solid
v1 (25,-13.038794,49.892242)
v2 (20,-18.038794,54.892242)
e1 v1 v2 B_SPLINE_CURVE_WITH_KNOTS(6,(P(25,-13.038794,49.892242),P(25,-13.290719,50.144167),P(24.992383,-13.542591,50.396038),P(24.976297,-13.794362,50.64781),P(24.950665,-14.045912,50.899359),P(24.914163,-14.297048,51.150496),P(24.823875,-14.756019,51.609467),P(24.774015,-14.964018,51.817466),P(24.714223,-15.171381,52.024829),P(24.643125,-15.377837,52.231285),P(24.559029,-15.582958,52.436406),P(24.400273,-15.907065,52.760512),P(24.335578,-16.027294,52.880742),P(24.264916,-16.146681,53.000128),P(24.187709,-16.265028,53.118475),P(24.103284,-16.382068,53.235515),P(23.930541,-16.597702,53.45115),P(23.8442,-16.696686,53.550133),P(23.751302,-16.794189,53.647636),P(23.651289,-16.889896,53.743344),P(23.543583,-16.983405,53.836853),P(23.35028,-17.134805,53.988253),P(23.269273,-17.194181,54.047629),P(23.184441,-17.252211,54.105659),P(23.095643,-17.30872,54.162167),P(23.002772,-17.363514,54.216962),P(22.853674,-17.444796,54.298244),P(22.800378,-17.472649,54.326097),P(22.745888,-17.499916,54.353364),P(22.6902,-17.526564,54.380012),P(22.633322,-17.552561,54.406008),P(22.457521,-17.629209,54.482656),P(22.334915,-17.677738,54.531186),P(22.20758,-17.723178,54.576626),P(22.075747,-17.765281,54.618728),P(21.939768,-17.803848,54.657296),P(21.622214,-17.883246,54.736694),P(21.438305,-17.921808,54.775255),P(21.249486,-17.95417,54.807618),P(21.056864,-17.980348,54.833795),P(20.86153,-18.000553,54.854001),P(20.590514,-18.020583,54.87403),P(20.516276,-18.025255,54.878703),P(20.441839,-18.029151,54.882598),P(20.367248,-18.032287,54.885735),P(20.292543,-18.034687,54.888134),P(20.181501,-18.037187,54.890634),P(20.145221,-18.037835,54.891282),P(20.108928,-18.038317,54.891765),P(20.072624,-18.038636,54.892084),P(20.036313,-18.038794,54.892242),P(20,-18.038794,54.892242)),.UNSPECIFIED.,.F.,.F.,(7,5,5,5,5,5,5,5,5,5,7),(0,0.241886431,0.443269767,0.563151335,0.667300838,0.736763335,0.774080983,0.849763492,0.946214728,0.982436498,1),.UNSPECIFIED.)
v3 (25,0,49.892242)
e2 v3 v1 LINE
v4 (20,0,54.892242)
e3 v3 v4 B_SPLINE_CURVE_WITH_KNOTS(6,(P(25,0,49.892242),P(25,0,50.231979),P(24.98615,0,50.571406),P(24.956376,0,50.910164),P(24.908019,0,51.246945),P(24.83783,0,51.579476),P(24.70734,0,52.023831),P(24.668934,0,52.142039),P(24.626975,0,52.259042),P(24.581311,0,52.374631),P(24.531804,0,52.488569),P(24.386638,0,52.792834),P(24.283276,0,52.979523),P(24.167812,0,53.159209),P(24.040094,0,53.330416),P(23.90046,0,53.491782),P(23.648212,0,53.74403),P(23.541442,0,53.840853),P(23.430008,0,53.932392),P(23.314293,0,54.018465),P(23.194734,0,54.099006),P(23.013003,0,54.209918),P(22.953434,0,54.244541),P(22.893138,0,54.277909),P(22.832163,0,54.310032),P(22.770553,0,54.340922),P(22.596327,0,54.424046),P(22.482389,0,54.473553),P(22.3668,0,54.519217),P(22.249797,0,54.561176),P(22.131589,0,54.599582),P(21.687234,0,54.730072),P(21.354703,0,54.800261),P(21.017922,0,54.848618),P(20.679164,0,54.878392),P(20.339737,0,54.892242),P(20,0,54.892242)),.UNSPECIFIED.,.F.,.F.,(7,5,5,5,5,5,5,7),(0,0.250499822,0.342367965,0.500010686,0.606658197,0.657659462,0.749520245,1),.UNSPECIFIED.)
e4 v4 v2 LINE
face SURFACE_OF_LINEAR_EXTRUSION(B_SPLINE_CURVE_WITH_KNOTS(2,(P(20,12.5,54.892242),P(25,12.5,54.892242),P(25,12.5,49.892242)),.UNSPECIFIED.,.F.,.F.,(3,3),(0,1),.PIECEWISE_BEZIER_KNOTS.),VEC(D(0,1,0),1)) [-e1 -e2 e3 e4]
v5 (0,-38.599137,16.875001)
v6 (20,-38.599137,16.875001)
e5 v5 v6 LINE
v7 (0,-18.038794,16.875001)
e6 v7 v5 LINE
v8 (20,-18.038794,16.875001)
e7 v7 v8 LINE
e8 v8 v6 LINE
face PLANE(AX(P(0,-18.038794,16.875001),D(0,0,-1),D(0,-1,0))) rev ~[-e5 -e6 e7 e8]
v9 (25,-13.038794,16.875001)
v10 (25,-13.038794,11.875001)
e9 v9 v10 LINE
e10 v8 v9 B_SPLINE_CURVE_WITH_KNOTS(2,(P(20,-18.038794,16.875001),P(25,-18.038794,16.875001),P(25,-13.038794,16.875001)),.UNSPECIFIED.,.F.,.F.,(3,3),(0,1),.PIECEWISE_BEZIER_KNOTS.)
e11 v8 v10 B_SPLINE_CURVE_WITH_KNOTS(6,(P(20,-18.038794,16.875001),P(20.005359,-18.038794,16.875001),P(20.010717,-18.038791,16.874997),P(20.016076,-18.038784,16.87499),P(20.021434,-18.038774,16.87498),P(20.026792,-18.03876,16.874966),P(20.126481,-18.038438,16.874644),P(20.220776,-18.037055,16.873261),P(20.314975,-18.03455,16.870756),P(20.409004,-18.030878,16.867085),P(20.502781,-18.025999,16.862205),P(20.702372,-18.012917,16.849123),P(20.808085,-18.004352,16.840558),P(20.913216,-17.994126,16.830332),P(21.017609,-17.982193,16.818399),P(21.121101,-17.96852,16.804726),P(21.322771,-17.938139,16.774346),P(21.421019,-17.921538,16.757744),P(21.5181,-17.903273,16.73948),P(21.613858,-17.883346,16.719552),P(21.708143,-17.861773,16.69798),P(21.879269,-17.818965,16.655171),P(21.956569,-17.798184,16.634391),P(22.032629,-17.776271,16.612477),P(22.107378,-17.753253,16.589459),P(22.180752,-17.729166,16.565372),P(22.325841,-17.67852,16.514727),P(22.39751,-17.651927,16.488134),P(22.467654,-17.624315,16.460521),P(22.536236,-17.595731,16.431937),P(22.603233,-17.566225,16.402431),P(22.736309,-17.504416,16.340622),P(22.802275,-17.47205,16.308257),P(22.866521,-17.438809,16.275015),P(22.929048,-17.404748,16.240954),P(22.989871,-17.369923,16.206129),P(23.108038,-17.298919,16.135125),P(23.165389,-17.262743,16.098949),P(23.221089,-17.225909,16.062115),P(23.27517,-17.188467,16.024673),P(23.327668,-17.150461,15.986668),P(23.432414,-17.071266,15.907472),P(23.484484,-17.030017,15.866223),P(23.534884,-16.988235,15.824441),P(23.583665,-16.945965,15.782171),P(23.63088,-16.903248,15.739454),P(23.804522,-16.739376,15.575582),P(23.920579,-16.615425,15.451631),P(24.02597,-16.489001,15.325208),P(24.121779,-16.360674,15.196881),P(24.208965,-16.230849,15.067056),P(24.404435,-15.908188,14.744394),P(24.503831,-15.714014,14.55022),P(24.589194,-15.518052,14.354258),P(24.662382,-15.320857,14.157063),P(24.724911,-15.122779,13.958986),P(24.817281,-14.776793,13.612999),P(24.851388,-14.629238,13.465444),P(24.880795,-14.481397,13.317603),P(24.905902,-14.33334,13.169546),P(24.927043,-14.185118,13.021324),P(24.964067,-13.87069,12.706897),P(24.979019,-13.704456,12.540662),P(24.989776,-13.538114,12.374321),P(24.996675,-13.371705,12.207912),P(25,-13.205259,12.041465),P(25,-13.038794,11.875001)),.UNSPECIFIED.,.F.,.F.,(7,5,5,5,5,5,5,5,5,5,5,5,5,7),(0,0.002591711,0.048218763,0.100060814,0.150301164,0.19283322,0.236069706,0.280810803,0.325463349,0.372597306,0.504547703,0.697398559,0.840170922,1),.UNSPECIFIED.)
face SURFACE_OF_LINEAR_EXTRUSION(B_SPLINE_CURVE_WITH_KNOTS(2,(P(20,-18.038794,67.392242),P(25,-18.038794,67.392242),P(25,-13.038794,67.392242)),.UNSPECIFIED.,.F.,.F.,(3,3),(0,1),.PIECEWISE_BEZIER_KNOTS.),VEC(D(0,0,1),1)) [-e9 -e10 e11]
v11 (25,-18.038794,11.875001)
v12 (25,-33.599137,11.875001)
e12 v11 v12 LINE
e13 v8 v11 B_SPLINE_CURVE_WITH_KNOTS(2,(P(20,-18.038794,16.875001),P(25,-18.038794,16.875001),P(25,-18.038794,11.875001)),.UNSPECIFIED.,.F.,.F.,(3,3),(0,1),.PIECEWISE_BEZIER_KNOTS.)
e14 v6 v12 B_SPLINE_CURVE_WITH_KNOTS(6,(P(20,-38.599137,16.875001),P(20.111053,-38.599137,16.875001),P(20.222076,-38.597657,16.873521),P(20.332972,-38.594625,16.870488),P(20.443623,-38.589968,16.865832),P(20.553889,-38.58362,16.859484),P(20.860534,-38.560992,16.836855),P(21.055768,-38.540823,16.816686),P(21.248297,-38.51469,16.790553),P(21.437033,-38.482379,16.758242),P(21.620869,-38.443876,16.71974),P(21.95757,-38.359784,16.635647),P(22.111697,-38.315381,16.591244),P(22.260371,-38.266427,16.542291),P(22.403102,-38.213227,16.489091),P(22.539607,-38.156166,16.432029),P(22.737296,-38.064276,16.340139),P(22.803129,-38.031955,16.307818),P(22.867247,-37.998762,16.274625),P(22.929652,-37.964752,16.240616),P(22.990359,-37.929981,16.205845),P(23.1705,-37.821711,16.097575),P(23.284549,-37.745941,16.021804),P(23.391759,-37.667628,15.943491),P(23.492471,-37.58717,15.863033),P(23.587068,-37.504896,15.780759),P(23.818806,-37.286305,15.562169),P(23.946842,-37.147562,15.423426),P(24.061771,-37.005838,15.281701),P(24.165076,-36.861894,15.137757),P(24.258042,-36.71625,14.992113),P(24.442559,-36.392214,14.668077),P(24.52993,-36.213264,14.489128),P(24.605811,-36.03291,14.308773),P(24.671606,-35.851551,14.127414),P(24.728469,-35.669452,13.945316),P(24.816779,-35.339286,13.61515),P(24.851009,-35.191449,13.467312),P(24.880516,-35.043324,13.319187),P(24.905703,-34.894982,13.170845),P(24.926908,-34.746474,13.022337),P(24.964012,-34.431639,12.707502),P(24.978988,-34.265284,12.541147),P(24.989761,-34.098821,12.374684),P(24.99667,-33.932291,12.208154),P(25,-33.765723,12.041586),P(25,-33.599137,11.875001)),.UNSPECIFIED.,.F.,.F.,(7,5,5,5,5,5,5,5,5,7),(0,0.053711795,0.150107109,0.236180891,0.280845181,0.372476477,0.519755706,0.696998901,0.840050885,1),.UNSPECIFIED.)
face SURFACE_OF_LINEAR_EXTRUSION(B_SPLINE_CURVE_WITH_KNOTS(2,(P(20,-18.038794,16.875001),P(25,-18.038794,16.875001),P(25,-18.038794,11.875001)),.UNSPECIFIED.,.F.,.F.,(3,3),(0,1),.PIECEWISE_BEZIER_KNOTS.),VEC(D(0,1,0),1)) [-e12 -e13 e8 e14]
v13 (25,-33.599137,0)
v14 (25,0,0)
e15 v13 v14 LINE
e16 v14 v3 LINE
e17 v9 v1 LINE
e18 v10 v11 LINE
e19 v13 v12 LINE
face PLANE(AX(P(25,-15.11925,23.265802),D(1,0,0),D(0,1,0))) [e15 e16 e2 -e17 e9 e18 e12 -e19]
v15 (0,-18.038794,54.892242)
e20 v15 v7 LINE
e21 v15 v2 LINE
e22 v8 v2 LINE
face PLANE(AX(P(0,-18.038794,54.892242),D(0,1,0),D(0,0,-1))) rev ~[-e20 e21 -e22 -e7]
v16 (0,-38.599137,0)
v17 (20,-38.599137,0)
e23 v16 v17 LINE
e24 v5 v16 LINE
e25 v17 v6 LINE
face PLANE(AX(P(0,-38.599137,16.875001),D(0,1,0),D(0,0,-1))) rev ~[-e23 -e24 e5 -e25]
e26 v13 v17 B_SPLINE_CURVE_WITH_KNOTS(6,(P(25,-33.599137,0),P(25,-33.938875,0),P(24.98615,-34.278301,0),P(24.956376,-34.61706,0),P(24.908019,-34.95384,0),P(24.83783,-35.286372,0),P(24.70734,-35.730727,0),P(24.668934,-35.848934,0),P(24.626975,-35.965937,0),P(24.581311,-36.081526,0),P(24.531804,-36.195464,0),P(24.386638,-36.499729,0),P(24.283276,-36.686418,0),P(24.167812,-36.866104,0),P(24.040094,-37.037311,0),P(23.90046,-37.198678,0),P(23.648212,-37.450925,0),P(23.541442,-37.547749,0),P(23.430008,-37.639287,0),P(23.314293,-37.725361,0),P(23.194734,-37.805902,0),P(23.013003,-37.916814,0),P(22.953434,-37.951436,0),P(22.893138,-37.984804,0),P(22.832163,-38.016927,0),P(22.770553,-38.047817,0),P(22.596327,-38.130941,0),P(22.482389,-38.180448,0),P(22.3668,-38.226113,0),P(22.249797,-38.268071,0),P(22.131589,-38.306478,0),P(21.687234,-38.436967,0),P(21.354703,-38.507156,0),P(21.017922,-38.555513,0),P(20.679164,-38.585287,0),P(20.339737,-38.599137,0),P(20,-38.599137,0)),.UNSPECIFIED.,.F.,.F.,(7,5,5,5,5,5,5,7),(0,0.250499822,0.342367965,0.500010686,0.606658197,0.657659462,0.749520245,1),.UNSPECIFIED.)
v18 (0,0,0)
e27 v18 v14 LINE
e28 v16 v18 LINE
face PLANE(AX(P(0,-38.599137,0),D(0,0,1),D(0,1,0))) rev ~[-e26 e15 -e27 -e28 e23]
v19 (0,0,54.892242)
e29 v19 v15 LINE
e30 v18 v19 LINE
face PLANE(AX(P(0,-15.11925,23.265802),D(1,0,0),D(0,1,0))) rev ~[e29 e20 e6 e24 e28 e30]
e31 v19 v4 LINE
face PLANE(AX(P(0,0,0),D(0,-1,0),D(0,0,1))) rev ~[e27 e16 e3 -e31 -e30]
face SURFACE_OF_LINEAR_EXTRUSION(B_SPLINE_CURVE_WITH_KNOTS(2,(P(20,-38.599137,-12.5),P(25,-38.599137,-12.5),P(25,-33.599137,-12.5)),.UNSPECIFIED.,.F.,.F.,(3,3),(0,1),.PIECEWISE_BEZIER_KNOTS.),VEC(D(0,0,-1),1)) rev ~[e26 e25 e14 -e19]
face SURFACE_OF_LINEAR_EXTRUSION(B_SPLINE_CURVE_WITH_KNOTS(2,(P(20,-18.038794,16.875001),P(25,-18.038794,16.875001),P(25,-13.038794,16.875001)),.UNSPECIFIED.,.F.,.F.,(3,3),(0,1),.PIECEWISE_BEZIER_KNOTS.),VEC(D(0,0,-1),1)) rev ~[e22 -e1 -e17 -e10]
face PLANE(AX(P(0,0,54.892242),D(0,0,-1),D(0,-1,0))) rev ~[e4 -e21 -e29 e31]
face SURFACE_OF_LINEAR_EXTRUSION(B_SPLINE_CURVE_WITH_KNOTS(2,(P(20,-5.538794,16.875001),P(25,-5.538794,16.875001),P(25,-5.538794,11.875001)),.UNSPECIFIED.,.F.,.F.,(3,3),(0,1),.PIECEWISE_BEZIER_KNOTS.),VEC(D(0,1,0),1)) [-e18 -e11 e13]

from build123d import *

# Parameters (mm, degrees)
F1_DEPTH     = 25
F2_T1_DEPTH  = 50.5172412843
F2_T3_DEPTH  = 43.0387943983
F2_T5_DEPTH  = 33.0603428185
F2_T7_DEPTH  = 41.8750006706
F2_T13_DEPTH = 63.0172412843
F2_T17_DEPTH = 45.5603428185


# Not quite as in the source:
# - a fillet or chamfer that OpenCascade refuses, or shapes differently, is made with other operations: its cross-section is extruded or revolved along the edge and cut away or added


with BuildPart() as f1:
    # F0 (on Right) → F1 (new body)
    with BuildSketch(Plane.YZ):
        Polygon((-38.5991372168, 16.8750006706), (-38.5991372168, 0), (0, 0), (0, 54.8922419548), (-18.0387943983, 54.8922419548), (-18.0387943983, 16.8750006706), align=None)
    extrude(amount=F1_DEPTH)

    # F2: fillet of radius 5 on 4 edges, made by hand

    # F2_s2 → F2_t1 (cut)
    with BuildSketch(Plane.XY.offset(16.8750006706)):
        with BuildLine():
            add(Edge.make_bspline(
                [(20, -18.0387943983), (25, -18.0387943983), (25, -13.0387943983)],
                knots=[0, 0, 0, 1, 1, 1], degree=2, weights=[1, 1, 1]))
            Line((25, -13.0387943983), (25, -18.0387943983))
            Line((25, -18.0387943983), (20, -18.0387943983))
        make_face()
    extrude(amount=F2_T1_DEPTH, mode=Mode.SUBTRACT)

    # F2_s4 → F2_t3 (cut)
    with BuildSketch(Plane.XZ.offset(-12.5)):
        with BuildLine():
            add(Edge.make_bspline(
                [(20, 54.8922419548), (25, 54.8922419548), (25, 49.8922419548)],
                knots=[0, 0, 0, 1, 1, 1], degree=2, weights=[1, 1, 1]))
            Line((25, 49.8922419548), (25, 54.8922419548))
            Line((25, 54.8922419548), (20, 54.8922419548))
        make_face()
    extrude(amount=F2_T3_DEPTH, mode=Mode.SUBTRACT)

    # F2_s6 → F2_t5 (cut)
    with BuildSketch(Plane.XZ.offset(18.0387943983)):
        with BuildLine():
            add(Edge.make_bspline(
                [(20, 16.8750006706), (25, 16.8750006706), (25, 11.8750006706)],
                knots=[0, 0, 0, 1, 1, 1], degree=2, weights=[1, 1, 1]))
            Line((25, 11.8750006706), (25, 16.8750006706))
            Line((25, 16.8750006706), (20, 16.8750006706))
        make_face()
    extrude(amount=F2_T5_DEPTH, mode=Mode.SUBTRACT)

    # F2_s8 → F2_t7 (cut)
    with BuildSketch(Plane.XY.offset(-12.5)):
        with BuildLine():
            add(Edge.make_bspline(
                [(20, -38.5991372168), (25, -38.5991372168), (25, -33.5991372168)],
                knots=[0, 0, 0, 1, 1, 1], degree=2, weights=[1, 1, 1]))
            Line((25, -33.5991372168), (25, -38.5991372168))
            Line((25, -38.5991372168), (20, -38.5991372168))
        make_face()
    extrude(amount=F2_T7_DEPTH, mode=Mode.SUBTRACT)


with BuildPart() as f2_tool11:
    # F2_s12 → F2_t13 (new body)
    with BuildSketch(Plane.XY.offset(67.3922419548)):
        with BuildLine():
            add(Edge.make_bspline(
                [(20, -18.0387943983), (25, -18.0387943983), (25, -13.0387943983)],
                knots=[0, 0, 0, 1, 1, 1], degree=2, weights=[1, 1, 1]))
            Line((25, -13.0387943983), (25, -18.0387943983))
            Line((25, -18.0387943983), (20, -18.0387943983))
        make_face()
    extrude(amount=-F2_T13_DEPTH)

    split(bisect_by=Plane.XY.offset(16.8750006706), keep=Keep.BOTTOM)


with BuildPart() as f2_tool15:
    # F2_s16 → F2_t17 (new body)
    with BuildSketch(Plane.XZ.offset(5.5387943983)):
        with BuildLine():
            add(Edge.make_bspline(
                [(20, 16.8750006706), (25, 16.8750006706), (25, 11.8750006706)],
                knots=[0, 0, 0, 1, 1, 1], degree=2, weights=[1, 1, 1]))
            Line((25, 11.8750006706), (25, 16.8750006706))
            Line((25, 16.8750006706), (20, 16.8750006706))
        make_face()
    extrude(amount=F2_T17_DEPTH)

    split(bisect_by=Plane.XZ.offset(18.0387943983), keep=Keep.BOTTOM)


with BuildPart() as f2_tool11_1:
    add(f2_tool11.part)

    # F2_t19: intersect F2_tool15
    add(f2_tool15.part, mode=Mode.INTERSECT)


with BuildPart() as f1_1:
    add(f1.part)

    # F2_t9: cut F2_tool11
    add(f2_tool11_1.part, mode=Mode.SUBTRACT)


solid = f1_1.part
